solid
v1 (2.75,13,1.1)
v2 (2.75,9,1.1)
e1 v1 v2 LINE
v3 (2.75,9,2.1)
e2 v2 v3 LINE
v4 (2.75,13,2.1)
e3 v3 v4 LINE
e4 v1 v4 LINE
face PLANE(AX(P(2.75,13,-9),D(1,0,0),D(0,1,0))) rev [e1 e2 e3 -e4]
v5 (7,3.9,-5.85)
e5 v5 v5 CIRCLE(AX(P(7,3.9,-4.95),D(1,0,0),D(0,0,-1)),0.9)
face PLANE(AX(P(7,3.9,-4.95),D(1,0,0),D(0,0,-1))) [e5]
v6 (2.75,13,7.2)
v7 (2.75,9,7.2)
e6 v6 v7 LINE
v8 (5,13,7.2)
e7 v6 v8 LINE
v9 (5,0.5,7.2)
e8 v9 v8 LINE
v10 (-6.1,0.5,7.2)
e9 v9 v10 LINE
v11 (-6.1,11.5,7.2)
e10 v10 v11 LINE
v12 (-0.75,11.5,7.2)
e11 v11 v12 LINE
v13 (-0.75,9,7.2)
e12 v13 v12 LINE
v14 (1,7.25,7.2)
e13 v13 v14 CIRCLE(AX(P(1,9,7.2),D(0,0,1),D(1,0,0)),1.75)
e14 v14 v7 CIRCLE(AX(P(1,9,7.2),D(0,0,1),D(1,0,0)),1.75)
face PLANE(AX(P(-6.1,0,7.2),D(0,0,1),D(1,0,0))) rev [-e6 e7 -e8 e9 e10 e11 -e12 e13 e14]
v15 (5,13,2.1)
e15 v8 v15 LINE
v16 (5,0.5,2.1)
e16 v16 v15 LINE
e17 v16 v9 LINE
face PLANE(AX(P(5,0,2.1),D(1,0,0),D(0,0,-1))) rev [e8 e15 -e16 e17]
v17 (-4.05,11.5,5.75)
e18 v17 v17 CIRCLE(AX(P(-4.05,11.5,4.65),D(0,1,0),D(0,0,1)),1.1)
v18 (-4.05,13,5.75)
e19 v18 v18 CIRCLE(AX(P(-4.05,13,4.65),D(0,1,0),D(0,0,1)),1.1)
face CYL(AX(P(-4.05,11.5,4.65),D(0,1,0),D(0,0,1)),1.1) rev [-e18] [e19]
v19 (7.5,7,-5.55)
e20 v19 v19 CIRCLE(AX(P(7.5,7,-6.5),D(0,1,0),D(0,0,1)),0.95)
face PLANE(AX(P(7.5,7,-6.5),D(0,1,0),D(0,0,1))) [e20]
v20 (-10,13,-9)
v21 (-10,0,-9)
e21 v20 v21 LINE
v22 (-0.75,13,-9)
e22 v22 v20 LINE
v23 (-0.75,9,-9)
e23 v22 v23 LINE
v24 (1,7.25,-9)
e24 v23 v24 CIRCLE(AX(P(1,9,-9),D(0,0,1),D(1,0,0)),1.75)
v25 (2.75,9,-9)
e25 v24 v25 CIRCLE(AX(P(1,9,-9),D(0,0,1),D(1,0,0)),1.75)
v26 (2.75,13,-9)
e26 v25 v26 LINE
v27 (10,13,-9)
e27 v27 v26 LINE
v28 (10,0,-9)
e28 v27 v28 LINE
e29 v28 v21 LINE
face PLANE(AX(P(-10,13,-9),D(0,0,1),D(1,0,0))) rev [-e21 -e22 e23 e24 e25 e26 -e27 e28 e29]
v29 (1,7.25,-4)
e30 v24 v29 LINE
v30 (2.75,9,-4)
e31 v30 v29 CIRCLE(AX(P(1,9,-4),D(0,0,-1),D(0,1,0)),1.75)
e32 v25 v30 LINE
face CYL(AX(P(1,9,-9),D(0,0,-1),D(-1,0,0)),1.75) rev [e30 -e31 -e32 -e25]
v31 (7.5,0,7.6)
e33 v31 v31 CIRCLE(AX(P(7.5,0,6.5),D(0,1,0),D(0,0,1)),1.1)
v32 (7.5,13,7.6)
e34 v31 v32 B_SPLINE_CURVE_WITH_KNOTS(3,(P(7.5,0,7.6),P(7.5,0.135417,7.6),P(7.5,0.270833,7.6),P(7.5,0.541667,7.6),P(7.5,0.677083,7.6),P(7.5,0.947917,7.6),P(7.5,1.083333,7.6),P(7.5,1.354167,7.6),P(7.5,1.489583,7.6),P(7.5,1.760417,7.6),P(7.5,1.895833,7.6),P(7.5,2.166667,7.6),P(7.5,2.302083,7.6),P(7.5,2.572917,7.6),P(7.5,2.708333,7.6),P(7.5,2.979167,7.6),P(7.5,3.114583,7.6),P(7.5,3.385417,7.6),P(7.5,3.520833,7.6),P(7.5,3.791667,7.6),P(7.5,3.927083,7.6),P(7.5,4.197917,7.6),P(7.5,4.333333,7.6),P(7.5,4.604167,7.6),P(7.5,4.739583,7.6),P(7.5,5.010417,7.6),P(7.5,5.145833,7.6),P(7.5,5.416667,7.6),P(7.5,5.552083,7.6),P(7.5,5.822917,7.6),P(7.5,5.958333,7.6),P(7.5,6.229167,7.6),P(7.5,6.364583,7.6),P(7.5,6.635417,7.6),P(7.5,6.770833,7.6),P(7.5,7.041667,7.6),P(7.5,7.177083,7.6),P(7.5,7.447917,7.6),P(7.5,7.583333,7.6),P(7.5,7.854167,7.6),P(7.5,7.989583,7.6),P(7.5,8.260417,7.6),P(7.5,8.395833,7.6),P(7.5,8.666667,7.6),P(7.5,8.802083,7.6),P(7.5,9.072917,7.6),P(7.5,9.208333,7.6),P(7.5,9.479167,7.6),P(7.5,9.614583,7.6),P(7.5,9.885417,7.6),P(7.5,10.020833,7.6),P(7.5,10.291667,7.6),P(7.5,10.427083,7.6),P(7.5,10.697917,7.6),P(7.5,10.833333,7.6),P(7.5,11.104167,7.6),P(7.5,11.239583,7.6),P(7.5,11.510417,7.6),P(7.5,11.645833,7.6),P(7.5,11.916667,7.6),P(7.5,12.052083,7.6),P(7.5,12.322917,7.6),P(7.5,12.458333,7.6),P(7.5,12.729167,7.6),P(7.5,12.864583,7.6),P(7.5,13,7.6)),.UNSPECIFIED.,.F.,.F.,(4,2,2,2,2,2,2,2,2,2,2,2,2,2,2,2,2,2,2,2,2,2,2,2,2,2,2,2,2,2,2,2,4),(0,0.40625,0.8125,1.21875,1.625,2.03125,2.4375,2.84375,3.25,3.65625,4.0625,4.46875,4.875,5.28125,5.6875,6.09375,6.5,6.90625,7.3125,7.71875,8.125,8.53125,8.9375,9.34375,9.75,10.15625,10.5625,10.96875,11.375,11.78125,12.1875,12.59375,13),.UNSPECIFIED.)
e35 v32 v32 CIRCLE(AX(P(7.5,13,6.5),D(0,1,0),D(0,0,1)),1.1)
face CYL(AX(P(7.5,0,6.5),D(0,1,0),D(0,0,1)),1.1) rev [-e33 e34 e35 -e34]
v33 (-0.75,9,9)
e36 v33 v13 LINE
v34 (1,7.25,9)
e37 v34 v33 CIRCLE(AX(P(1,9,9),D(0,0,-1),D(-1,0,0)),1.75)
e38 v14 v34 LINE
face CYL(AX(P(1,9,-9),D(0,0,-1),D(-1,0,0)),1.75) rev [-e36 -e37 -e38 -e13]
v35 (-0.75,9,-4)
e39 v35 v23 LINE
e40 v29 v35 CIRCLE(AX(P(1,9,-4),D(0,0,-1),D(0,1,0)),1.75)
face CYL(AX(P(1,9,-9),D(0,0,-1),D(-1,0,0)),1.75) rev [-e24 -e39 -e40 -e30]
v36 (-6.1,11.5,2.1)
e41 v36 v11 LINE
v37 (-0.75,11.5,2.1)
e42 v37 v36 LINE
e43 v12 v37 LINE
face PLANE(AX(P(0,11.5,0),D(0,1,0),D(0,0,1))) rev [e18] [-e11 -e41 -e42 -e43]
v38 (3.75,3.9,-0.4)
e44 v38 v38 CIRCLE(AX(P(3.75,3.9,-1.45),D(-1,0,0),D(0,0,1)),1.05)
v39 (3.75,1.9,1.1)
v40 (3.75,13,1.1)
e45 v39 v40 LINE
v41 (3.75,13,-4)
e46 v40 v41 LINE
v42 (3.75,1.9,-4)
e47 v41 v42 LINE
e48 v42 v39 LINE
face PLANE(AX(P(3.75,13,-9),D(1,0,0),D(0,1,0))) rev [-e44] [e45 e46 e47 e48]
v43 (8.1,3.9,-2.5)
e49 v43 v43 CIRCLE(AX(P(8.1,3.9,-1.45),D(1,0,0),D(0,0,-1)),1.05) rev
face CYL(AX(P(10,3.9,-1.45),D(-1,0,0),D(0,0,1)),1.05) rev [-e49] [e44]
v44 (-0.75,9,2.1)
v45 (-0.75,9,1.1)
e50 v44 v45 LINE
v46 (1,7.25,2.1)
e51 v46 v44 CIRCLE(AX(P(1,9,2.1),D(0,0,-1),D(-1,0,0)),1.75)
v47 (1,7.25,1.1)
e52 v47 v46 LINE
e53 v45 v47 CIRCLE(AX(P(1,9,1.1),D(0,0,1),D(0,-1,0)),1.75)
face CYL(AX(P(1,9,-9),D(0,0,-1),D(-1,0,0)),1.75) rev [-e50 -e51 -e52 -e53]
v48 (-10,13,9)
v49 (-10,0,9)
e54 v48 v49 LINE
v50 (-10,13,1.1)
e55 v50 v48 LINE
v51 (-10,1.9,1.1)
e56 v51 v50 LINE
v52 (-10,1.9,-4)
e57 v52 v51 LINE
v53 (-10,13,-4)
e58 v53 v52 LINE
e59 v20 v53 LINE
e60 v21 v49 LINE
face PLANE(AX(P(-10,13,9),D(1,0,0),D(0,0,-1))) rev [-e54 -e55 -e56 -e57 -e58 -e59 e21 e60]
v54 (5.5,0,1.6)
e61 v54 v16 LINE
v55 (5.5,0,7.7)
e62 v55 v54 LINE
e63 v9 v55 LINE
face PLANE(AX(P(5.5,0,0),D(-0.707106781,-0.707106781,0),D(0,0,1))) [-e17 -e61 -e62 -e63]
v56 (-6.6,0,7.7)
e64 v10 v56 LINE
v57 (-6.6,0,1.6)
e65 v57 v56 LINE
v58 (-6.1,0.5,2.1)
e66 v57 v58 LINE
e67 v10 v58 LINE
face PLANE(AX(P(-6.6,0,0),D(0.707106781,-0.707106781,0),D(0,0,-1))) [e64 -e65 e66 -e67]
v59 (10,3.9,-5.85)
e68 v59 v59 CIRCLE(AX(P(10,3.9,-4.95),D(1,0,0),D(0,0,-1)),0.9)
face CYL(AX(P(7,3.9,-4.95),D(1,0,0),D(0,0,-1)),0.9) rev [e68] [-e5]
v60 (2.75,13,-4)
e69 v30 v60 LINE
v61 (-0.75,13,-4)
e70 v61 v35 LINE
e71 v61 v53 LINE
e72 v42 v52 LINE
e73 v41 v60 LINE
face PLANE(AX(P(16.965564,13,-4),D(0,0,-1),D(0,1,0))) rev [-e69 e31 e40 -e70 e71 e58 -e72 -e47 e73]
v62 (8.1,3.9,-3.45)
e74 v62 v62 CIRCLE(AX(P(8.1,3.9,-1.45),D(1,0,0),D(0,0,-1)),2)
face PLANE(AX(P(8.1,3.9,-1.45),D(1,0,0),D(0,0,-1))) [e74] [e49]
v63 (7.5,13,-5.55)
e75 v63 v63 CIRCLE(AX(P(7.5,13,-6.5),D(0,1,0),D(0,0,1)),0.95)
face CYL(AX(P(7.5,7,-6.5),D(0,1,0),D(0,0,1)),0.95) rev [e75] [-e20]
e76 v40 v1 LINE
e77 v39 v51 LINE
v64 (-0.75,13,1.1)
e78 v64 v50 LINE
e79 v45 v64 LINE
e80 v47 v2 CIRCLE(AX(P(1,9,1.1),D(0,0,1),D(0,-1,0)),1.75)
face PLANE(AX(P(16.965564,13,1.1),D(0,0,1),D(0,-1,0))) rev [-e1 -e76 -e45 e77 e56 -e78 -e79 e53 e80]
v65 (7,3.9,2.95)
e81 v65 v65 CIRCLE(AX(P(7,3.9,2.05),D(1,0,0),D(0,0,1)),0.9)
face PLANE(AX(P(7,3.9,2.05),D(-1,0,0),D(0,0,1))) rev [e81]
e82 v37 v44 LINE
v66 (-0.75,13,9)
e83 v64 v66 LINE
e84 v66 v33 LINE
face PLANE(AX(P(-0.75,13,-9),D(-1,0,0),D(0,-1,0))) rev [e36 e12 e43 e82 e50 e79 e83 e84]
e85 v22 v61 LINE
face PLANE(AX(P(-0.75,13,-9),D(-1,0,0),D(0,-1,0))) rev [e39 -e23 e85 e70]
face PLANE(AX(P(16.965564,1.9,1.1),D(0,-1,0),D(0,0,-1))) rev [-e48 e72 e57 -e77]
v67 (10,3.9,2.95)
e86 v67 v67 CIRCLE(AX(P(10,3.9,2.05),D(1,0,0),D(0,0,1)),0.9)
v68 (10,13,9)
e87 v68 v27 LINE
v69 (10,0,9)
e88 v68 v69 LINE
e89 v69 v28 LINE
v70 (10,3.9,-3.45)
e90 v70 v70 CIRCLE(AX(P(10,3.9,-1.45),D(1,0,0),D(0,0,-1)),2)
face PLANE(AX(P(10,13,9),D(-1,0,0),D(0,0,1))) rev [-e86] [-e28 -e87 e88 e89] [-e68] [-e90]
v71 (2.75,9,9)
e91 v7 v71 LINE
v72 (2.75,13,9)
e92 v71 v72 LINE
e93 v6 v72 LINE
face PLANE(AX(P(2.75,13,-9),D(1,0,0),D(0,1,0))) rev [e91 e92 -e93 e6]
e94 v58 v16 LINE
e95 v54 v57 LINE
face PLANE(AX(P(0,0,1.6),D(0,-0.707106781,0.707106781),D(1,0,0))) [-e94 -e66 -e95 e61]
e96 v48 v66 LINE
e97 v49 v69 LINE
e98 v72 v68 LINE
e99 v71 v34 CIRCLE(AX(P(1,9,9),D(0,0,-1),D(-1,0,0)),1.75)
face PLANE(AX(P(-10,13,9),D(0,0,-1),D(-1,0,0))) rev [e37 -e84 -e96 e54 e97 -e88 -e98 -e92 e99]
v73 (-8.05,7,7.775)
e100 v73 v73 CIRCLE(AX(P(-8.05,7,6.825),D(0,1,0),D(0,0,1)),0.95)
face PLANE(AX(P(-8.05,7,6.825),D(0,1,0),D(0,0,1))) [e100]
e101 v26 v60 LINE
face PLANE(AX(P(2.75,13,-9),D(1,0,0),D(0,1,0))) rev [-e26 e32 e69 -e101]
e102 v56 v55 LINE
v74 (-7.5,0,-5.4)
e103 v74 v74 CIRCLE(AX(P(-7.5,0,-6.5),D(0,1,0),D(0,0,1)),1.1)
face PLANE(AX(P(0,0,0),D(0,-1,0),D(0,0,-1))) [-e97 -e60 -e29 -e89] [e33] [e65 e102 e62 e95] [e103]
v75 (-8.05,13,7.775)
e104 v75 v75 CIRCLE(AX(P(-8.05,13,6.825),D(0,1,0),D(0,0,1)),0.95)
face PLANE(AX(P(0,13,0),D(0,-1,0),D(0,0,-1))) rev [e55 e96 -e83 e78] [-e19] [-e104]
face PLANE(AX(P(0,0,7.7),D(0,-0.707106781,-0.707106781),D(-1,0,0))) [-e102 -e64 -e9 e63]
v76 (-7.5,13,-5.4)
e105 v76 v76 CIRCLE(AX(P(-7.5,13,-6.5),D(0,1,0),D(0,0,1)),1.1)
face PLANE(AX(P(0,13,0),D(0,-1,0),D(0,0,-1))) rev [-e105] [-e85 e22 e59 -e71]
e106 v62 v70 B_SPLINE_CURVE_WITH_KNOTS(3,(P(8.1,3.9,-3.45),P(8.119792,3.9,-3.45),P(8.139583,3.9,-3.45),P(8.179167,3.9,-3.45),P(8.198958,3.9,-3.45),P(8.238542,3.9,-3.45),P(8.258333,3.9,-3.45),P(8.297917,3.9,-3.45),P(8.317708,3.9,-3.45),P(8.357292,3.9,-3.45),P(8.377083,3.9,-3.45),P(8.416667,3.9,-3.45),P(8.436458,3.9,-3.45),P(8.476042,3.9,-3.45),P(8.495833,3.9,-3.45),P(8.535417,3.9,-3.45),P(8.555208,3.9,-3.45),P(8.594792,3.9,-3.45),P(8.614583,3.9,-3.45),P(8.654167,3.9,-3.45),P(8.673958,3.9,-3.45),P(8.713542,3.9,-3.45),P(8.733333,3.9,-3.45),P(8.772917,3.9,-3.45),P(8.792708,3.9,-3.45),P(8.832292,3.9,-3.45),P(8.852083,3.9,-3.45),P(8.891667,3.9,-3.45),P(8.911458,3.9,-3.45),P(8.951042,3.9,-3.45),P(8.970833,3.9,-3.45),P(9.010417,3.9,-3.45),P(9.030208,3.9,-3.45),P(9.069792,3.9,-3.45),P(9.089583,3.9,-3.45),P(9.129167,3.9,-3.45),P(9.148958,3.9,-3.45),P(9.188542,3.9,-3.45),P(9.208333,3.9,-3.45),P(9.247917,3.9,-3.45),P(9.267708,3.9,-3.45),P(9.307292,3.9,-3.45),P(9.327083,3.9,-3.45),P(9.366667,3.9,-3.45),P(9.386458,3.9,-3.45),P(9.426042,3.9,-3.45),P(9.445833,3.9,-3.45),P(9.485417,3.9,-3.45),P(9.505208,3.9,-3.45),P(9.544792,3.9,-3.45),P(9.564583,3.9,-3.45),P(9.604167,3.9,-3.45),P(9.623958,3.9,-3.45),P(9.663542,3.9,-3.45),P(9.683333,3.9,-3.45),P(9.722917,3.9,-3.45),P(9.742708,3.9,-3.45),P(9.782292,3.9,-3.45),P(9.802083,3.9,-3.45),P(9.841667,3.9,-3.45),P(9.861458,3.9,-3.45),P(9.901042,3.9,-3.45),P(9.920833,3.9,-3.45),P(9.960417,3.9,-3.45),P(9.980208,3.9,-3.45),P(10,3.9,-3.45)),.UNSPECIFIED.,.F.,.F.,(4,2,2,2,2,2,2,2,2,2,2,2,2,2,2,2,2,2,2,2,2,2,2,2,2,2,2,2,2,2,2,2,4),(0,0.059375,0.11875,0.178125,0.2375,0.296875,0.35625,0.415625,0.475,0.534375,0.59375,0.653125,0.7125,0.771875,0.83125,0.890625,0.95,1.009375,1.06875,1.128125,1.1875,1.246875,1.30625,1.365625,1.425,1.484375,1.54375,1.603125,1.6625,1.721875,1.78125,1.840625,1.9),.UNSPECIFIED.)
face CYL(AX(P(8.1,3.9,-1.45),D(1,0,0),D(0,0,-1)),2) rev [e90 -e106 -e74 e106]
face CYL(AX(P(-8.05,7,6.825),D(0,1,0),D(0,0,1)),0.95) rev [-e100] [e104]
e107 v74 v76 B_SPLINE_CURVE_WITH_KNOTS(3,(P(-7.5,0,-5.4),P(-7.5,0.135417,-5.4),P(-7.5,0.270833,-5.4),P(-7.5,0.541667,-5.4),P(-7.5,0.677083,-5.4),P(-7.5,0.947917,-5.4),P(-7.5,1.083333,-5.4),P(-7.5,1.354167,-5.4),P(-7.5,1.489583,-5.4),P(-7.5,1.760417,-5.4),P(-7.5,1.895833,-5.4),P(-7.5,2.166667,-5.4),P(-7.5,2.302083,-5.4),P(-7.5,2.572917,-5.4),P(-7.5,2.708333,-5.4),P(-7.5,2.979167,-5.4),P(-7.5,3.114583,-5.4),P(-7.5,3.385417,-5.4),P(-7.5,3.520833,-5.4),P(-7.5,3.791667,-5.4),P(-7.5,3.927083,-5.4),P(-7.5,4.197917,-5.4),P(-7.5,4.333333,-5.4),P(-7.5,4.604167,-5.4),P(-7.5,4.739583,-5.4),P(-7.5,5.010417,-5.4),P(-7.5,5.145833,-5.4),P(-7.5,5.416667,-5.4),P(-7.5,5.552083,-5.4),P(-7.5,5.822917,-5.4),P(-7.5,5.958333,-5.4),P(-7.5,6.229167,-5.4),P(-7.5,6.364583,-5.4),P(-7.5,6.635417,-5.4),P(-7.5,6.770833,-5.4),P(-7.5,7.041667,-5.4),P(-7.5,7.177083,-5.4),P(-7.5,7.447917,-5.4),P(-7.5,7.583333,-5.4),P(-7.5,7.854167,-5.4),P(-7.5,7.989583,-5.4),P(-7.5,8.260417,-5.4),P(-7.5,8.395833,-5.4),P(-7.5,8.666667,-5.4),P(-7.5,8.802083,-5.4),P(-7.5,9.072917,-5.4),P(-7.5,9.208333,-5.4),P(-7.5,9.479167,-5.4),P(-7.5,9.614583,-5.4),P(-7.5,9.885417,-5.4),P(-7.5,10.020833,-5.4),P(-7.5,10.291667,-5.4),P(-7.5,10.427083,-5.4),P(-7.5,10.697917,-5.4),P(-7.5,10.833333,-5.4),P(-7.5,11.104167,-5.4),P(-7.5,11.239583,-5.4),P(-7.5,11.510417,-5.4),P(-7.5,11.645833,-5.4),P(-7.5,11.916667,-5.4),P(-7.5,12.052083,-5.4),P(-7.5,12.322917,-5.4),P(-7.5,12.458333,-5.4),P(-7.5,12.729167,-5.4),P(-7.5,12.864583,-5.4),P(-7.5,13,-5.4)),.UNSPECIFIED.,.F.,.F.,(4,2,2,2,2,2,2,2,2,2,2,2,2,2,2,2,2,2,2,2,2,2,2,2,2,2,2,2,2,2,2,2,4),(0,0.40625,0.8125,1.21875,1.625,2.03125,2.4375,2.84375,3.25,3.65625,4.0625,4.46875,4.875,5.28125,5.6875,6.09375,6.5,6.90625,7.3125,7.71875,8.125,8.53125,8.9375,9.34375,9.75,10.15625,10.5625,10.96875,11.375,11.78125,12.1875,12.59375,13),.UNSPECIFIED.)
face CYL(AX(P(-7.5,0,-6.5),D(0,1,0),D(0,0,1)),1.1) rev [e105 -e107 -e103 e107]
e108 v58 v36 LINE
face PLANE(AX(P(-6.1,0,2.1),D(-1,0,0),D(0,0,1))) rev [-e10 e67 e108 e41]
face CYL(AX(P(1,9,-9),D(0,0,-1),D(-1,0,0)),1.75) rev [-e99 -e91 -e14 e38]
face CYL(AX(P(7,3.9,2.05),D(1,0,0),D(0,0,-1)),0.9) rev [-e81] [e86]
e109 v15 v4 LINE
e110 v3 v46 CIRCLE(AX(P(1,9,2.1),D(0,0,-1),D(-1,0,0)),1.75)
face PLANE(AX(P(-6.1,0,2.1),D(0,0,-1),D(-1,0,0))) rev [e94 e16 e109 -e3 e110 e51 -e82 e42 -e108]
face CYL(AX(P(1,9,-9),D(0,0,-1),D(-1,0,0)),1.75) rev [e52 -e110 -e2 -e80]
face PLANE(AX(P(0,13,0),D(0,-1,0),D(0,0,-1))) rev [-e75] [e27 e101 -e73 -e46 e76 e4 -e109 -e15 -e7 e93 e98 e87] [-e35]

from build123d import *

# Parameters (mm, degrees)
SKETCH1_W           = 20
SKETCH1_H           = 18
BOSS_EXTRUDE1_DEPTH = 13
SKETCH7_W           = 3.5
SKETCH7_H           = 5.75
CUT_EXTRUDE6_DEPTH  = 25.351591324
SKETCH2_W           = 5.1
SKETCH2_H           = 11.1
CUT_EXTRUDE1_DEPTH  = 13.75
SKETCH3_R           = 1.05
CUT_EXTRUDE2_DEPTH  = 21.953818268
SKETCH4_R           = 2
CUT_EXTRUDE3_DEPTH  = 1.9
SKETCH11_R          = 0.9
CUT_EXTRUDE9_DEPTH  = 3
SKETCH5_W           = 11.1
SKETCH5_H           = 5.1
CUT_EXTRUDE4_DEPTH  = 19.708286934
SKETCH8_W           = 5.35
SKETCH8_H           = 5.1
SKETCH8_R           = 1.1
BOSS_EXTRUDE2_DEPTH = 1.5
SKETCH10_R          = 0.95
CUT_EXTRUDE8_DEPTH  = 6
SKETCH14_R          = 1.1
CUT_EXTRUDE11_DEPTH = 19.708286934
FILLET2_R           = 1.75
CHAMFER1_SIZE       = 0.5


with BuildPart() as part:
    # Sketch1 → Boss-Extrude1 (new body)
    with BuildSketch(Plane(origin=(0, 0, 0), x_dir=(1, 0, 0), z_dir=(0, 1, 0))):
        Rectangle(SKETCH1_W, SKETCH1_H)
    extrude(amount=BOSS_EXTRUDE1_DEPTH)

    # Sketch7 → Cut-Extrude6 (cut, through all)
    with BuildSketch(Plane.XY.offset(9)):
        with Locations((1, 10.125)):
            Rectangle(SKETCH7_W, SKETCH7_H)
    extrude(amount=-CUT_EXTRUDE6_DEPTH, mode=Mode.SUBTRACT)

    # Sketch2 → Cut-Extrude1 (cut)
    with BuildSketch(Plane.ZY.offset(10)):
        with Locations((-1.45, 7.45)):
            Rectangle(SKETCH2_W, SKETCH2_H)
    extrude(amount=-CUT_EXTRUDE1_DEPTH, mode=Mode.SUBTRACT)

    # Sketch3 → Cut-Extrude2 (cut, through all)
    with BuildSketch(Plane.ZY.offset(-3.75)):
        with Locations((-1.45, 3.9)):
            Circle(SKETCH3_R)
    extrude(amount=-CUT_EXTRUDE2_DEPTH, mode=Mode.SUBTRACT)

    # Sketch4 → Cut-Extrude3 (cut)
    with BuildSketch(Plane(origin=(10, 0, 0), x_dir=(0, 0, -1), z_dir=(1, 0, 0))):
        with Locations((1.45, 3.9)):
            Circle(SKETCH4_R)
    extrude(amount=-CUT_EXTRUDE3_DEPTH, mode=Mode.SUBTRACT)

    # Sketch11 → Cut-Extrude9 (cut)
    with BuildSketch(Plane(origin=(10, 0, 0), x_dir=(0, 0, -1), z_dir=(1, 0, 0))):
        with Locations((4.95, 3.9)):
            Circle(SKETCH11_R)
        with Locations(Location((-2.05, 3.9, 0), (0, 0, 180))):
            Circle(SKETCH11_R)
    extrude(amount=-CUT_EXTRUDE9_DEPTH, mode=Mode.SUBTRACT)

    # Sketch5 → Cut-Extrude4 (cut, through all)
    with BuildSketch(Plane(origin=(0, 13, 0), x_dir=(1, 0, 0), z_dir=(0, 1, 0))):
        with Locations((-0.55, -4.65)):
            Rectangle(SKETCH5_W, SKETCH5_H)
    extrude(amount=-CUT_EXTRUDE4_DEPTH, mode=Mode.SUBTRACT)

    # Sketch8 → Boss-Extrude2 (add)
    with BuildSketch(Plane(origin=(0, 13, 0), x_dir=(1, 0, 0), z_dir=(0, 1, 0))):
        with Locations((-3.425, -4.65)):
            Rectangle(SKETCH8_W, SKETCH8_H)
        with Locations(Location((-4.05, -4.65, 0), (0, 0, 270))):
            Circle(SKETCH8_R, mode=Mode.SUBTRACT)
    extrude(amount=-BOSS_EXTRUDE2_DEPTH)

    # Sketch10 → Cut-Extrude8 (cut)
    with BuildSketch(Plane(origin=(0, 13, 0), x_dir=(1, 0, 0), z_dir=(0, 1, 0))):
        with Locations(Location((-8.05, -6.825, 0), (0, 0, 270))):
            Circle(SKETCH10_R)
        with Locations(Location((7.5, 6.5, 0), (0, 0, 270))):
            Circle(SKETCH10_R)
    extrude(amount=-CUT_EXTRUDE8_DEPTH, mode=Mode.SUBTRACT)

    # Sketch14 → Cut-Extrude11 (cut, through all)
    with BuildSketch(Plane(origin=(0, 13, 0), x_dir=(1, 0, 0), z_dir=(0, 1, 0))):
        with Locations(Location((-7.5, 6.5, 0), (0, 0, 270))):
            Circle(SKETCH14_R)
        with Locations(Location((7.5, -6.5, 0), (0, 0, 270))):
            Circle(SKETCH14_R)
    extrude(amount=-CUT_EXTRUDE11_DEPTH, mode=Mode.SUBTRACT)

    # Fillet2
    fillet2_edges = [part.edges().sort_by_distance(p)[0] for p in [
        (2.75, 7.25, 8.1),
        (2.75, 7.25, 1.6),
        (-0.75, 7.25, 8.1),
        (-0.75, 7.25, 1.6),
        (2.75, 7.25, -6.5),
        (-0.75, 7.25, -6.5),
    ]]
    fillet(fillet2_edges, radius=FILLET2_R - 0.0001)  # a hair under: the kernel refuses the full size

    # Chamfer1
    chamfer1_edges = [part.edges().sort_by_distance(p)[0] for p in [
        (-0.55, 0, 2.1),
        (-0.55, 0, 7.2),
        (-6.1, 0, 4.65),
        (5, 0, 4.65),
    ]]
    chamfer(chamfer1_edges, length=CHAMFER1_SIZE)


solid = part.part
